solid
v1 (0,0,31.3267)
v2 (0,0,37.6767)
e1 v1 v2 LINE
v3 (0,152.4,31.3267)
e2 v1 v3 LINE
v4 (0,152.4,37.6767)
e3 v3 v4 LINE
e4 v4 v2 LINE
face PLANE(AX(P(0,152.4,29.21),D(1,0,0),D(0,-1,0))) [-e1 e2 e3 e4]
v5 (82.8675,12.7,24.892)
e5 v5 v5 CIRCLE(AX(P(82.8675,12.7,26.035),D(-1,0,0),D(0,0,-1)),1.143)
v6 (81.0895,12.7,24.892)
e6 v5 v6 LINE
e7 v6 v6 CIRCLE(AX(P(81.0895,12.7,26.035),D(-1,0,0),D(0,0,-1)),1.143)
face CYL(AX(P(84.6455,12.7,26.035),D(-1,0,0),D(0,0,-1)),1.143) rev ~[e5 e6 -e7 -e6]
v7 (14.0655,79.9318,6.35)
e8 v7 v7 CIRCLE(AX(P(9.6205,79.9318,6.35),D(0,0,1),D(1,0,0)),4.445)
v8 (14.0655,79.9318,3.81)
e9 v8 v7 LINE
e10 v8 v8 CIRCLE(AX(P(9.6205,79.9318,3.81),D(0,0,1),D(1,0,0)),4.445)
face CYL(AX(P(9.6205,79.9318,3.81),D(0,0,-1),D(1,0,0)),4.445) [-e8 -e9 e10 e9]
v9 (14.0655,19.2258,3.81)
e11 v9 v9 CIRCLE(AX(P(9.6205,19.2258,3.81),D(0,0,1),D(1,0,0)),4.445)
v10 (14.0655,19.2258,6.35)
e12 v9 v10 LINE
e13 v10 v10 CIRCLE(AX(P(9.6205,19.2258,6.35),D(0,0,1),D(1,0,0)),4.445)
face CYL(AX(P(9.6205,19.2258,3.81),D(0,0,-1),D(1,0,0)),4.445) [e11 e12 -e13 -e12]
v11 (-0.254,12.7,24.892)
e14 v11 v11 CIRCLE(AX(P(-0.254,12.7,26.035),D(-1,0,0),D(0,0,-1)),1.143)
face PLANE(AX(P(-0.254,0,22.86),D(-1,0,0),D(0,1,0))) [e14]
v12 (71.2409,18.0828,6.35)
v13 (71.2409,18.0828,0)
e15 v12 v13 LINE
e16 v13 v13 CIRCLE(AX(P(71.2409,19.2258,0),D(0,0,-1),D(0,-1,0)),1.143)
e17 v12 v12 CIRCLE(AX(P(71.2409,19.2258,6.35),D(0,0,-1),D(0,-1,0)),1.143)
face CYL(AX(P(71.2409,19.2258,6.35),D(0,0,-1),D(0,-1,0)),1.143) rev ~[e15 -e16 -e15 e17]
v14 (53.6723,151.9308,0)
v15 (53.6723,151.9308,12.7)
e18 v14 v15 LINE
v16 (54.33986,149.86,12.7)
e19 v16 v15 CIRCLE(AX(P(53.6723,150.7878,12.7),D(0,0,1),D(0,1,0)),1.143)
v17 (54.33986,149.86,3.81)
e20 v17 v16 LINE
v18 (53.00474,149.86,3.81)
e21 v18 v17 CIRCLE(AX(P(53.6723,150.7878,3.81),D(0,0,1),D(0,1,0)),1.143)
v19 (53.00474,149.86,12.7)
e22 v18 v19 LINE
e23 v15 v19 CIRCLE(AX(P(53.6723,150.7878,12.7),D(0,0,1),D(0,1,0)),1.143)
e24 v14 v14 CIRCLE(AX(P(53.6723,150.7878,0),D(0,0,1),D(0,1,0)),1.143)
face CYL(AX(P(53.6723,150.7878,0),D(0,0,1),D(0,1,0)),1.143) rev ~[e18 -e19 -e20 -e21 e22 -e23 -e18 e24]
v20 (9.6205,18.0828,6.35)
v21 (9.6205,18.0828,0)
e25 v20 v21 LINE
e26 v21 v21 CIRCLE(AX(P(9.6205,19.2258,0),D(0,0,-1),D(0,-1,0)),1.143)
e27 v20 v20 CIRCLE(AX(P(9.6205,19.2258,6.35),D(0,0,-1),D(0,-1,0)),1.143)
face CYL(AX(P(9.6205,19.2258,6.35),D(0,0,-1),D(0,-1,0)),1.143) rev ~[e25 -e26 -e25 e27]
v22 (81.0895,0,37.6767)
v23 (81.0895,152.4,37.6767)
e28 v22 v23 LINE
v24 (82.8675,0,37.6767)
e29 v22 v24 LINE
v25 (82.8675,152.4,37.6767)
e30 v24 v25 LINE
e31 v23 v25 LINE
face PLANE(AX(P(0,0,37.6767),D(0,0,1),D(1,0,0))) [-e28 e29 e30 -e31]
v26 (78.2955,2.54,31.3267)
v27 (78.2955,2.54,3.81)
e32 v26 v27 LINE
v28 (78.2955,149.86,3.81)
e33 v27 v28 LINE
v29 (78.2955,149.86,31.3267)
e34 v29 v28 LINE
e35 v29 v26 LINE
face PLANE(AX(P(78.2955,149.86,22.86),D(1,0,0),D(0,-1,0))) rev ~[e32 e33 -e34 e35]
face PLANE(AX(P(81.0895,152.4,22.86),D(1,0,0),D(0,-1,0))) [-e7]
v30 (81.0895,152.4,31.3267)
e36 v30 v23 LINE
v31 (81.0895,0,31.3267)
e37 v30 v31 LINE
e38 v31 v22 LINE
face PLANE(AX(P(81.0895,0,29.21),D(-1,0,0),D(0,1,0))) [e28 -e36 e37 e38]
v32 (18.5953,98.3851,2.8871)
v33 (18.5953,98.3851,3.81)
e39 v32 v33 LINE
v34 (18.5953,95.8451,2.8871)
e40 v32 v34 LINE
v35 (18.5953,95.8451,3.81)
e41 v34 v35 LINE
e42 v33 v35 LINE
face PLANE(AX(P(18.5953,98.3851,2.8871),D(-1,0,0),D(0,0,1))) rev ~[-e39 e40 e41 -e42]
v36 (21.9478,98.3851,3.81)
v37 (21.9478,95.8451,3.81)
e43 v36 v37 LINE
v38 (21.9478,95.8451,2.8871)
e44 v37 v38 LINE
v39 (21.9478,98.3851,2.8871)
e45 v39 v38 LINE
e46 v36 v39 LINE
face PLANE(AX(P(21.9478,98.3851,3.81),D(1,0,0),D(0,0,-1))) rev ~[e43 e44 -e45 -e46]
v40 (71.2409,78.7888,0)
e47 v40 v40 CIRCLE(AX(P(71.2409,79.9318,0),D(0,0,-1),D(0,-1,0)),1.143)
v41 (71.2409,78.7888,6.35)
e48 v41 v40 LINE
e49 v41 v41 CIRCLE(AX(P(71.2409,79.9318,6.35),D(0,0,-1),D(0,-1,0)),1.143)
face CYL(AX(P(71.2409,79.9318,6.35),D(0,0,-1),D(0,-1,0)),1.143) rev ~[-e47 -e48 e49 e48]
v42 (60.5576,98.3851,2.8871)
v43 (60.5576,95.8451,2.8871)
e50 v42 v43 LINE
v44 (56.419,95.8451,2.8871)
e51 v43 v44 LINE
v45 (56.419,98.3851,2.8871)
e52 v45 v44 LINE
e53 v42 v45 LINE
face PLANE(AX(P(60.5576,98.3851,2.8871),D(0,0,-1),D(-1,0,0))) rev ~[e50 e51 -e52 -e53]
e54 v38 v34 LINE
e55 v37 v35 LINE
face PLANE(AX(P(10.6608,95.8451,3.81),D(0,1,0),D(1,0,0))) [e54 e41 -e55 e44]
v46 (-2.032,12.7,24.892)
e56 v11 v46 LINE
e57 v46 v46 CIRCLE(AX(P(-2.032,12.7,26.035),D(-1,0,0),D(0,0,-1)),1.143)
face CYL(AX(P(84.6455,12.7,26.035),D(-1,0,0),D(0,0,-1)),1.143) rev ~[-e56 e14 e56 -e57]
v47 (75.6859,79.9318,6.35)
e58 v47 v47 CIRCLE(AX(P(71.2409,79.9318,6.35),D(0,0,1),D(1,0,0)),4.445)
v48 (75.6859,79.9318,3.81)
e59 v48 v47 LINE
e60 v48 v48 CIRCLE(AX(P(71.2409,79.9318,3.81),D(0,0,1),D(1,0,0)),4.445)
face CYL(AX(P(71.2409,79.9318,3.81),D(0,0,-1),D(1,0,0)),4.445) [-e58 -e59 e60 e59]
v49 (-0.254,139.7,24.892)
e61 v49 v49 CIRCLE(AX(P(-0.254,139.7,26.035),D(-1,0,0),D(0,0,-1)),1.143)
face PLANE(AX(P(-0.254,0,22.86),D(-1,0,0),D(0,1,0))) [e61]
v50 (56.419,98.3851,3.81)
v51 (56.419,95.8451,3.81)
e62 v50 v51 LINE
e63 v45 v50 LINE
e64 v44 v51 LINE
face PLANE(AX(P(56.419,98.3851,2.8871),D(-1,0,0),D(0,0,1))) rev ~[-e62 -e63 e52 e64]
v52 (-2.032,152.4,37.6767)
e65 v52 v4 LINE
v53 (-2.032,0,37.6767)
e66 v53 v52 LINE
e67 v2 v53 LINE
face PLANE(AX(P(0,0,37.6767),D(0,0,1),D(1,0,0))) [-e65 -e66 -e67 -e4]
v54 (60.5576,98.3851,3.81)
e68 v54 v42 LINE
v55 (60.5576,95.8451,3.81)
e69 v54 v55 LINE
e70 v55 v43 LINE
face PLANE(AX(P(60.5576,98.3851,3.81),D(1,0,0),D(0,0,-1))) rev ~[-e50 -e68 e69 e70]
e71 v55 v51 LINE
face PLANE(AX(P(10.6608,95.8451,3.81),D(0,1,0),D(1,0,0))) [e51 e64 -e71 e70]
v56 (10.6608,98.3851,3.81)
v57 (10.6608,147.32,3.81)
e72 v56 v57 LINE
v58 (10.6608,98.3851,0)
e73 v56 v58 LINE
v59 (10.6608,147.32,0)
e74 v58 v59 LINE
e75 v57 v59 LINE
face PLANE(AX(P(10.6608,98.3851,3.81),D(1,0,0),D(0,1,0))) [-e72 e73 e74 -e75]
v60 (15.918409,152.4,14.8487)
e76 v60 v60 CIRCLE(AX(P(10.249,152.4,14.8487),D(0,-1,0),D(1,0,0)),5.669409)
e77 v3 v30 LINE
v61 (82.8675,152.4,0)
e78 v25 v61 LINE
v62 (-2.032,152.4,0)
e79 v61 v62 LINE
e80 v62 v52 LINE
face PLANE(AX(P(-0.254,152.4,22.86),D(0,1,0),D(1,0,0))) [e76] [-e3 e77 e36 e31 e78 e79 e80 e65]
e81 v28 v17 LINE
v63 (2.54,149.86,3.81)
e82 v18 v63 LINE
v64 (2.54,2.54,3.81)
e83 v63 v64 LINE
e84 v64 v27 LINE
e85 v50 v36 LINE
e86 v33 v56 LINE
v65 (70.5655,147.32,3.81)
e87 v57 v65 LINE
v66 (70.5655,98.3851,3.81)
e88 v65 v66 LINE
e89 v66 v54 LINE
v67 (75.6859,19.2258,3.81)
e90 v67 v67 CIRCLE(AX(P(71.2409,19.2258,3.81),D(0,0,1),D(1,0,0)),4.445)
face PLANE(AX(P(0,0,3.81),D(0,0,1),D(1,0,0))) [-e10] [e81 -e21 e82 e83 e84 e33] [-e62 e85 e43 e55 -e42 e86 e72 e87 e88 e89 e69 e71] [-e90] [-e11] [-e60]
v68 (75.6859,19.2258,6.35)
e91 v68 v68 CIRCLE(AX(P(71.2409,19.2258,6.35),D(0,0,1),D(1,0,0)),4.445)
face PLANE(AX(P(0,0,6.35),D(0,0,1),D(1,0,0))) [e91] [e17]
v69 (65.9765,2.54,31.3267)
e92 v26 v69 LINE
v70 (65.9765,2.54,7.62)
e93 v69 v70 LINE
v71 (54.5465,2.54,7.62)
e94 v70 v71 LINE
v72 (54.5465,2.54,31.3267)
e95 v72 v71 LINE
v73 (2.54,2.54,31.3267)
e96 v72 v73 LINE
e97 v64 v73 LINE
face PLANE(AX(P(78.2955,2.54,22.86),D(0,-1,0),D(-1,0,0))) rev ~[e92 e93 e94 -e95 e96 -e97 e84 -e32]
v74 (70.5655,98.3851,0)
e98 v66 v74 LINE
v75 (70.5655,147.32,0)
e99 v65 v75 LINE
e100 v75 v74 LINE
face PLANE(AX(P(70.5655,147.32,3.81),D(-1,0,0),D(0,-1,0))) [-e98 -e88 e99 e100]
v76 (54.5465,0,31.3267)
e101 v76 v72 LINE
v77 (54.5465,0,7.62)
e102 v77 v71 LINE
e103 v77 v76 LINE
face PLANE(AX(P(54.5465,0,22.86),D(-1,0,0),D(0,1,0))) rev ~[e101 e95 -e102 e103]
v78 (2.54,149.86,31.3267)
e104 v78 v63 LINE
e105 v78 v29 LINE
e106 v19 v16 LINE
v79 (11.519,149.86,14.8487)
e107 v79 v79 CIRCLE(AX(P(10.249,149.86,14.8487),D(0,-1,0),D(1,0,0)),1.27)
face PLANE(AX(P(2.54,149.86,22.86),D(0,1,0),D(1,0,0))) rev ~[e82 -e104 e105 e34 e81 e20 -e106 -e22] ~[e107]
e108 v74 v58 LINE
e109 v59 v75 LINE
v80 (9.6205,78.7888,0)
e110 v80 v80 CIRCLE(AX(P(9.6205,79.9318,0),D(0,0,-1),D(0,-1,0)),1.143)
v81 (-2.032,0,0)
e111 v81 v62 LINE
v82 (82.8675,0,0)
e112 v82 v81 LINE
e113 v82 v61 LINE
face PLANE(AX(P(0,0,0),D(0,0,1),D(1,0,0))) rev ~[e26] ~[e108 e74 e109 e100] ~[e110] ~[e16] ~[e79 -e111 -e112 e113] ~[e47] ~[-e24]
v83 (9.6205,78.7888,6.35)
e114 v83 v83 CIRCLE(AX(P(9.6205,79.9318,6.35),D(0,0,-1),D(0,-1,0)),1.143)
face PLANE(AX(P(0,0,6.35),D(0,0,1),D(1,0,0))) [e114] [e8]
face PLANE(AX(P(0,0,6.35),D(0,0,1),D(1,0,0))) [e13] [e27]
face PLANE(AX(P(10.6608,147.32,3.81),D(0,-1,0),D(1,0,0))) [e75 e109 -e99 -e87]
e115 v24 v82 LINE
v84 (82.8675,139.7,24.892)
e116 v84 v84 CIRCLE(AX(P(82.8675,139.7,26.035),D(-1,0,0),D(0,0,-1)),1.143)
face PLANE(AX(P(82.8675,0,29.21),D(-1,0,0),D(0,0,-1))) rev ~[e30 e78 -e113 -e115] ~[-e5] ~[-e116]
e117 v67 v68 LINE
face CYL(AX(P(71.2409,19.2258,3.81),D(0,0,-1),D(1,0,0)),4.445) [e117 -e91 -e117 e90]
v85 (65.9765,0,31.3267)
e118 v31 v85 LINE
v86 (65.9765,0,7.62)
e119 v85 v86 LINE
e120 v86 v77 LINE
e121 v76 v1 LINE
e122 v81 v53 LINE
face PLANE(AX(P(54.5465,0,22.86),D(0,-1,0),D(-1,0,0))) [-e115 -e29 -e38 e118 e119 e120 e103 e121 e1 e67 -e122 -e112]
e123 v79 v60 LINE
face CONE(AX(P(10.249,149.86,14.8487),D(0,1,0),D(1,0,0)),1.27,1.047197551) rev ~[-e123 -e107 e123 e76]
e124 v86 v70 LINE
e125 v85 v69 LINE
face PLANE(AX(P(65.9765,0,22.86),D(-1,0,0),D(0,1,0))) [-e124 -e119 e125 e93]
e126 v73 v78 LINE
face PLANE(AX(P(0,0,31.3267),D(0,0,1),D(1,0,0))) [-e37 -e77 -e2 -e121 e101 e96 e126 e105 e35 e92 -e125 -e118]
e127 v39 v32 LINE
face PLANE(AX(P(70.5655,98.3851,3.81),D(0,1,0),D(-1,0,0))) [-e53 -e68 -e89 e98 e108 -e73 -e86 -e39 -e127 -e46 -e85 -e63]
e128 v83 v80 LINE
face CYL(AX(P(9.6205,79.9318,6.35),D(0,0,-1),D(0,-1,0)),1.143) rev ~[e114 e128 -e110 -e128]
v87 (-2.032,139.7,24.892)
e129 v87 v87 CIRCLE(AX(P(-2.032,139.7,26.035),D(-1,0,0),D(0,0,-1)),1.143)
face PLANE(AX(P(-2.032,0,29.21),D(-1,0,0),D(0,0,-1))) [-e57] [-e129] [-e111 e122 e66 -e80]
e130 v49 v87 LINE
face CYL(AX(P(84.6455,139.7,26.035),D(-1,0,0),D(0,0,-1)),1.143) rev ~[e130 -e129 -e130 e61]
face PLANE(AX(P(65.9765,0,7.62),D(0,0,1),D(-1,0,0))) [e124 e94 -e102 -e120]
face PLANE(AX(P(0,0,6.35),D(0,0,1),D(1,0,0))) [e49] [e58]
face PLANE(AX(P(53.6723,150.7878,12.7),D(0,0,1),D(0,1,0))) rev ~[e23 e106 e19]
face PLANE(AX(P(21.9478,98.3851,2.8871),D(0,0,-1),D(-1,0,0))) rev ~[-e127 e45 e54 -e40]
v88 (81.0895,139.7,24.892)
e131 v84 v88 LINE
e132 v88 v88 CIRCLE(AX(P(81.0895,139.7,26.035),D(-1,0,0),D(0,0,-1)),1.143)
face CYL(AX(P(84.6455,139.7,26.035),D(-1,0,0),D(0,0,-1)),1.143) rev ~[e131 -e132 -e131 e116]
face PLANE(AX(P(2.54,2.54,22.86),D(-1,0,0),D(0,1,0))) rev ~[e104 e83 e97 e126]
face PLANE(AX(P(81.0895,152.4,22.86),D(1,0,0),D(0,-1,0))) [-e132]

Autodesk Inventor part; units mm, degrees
ref_plane "YZ Plane" through (0, 0, 0) normal (1, 0, 0) x (0, 1, 0)
ref_plane "XZ Plane" through (0, 0, 0) normal (0, 1, 0) x (-1, 0, 0)
ref_plane "XY Plane" through (0, 0, 0) normal (0, 0, 1) x (1, 0, 0)
sketch "Sketch1" plane through (0, 0, 0) normal (0, 0, 1) x (1, 0, 0)
  line L0 (0, 0) -> (80.8355, 0)
  line L1 (80.8355, 0) -> (80.8355, 152.4)
  line L2 (80.8355, 152.4) -> (0, 152.4)
  line L3 (0, 152.4) -> (0, 0)
  dimension "d82" = 80.8355
  dimension "d90" = 152.4
extrude "Extrusion1" add sketch "Sketch1" along normal blind 22.86
sketch "Sketch2" plane through (0, 0, 22.86) normal (0, 0, 1) x (1, 0, 0)
  line L0 (2.54, 2.54) -> (78.2955, 2.54)
  line L1 (78.2955, 2.54) -> (78.2955, 149.86)
  line L2 (78.2955, 149.86) -> (2.54, 149.86)
  line L3 (2.54, 149.86) -> (2.54, 2.54)
  line L4 (0, 152.4) -> (0, 0)
  line L5 (0, 0) -> (80.8355, 0)
  line L6 (80.8355, 0) -> (80.8355, 152.4)
  line L7 (80.8355, 152.4) -> (0, 152.4)
  line L8 (0, 152.4) -> (0, 0) projected
  line L9 (0, 0) -> (80.8355, 0) projected
  point P0 (80.8355, 76.2)
  point P1 (0, 76.2)
  point P2 (40.4177, 0)
  dimension "d83" = 152.4
  dimension "d85" = 80.8355
  dimension "d86" = 2.54
  dimension "d87" = 2.54
  dimension "d88" = 2.54
  dimension "d89" = 2.54
extrude "Extrusion2" cut sketch "Sketch2" against normal blind 19.05 contours L3 L2 L1 L0
sketch "Sketch6" plane through (0, 0, 3.81) normal (0, 0, 1) x (1, 0, 0)
  line L0 (5.1487, 87.2258) -> (75.6867, 87.2258) construction
  line L1 (75.6867, 87.2258) -> (75.6867, 3.2258) construction
  line L2 (75.6867, 3.2258) -> (5.1487, 3.2258) construction
  line L3 (5.1487, 3.2258) -> (5.1487, 87.2258) construction
  circle A0 centre (9.6205, 79.9318) radius 1.6 construction
  circle A1 centre (71.2409, 79.9318) radius 1.6 construction
  circle A2 centre (9.6205, 19.2258) radius 1.6 construction
  circle A3 centre (71.2409, 19.2258) radius 1.6 construction
  line L4 (2.54, 149.86) -> (78.2955, 149.86) projected
  line L5 (0, 0) -> (80.8355, 0) projected
  line L6 (78.2955, 2.54) -> (2.54, 2.54) projected
  circle A4 centre (9.6205, 79.9318) radius 4.445
  circle A5 centre (71.2409, 79.9318) radius 4.445
  circle A6 centre (9.6205, 19.2258) radius 4.445
  circle A7 centre (71.2409, 19.2258) radius 4.445
  point P0 (40.4177, 87.2258)
  point P1 (40.4177, 149.86)
  point P2 (3.175, 0)
  point P3 (77.6605, 0)
  point P4 (2.54, 2.54)
  point P5 (14.1287, 30.2258)
  point P6 (46.6867, 15.7258)
  point P7 (60.2637, 3.2258)
  point P8 (80.8355, 12.6941)
  dimension "d18" = 70.538
  dimension "d19" = 84
  dimension "d30" = 3.2
  dimension "d31" = 60.706
  dimension "d32" = 61.6204
  dimension "d33" = 16
  dimension "d34" = 4.4458
  dimension "d36" = 0.6858
  dimension "d37" = 27
  dimension "d38" = 8.98
  dimension "d39" = 12.5
  dimension "d40" = 29
  dimension "d41" = 15.423
  dimension "d69" = 8.89
  dimension "d70" = 8.89
  dimension "d71" = 8.89
  dimension "d72" = 8.89
extrude "Extrusion7" add sketch "Sketch6" along normal blind 2.54
sketch "Sketch15" plane through (9.6205, 79.9318, 6.35) normal (0, 0, 1) x (1, 0, 0)
  circle A0 centre (0, 0) radius 4.445 projected
  circle A1 centre (61.6204, 0) radius 4.445 projected
  circle A2 centre (61.6204, -60.706) radius 4.445 projected
  circle A3 centre (0, -60.706) radius 4.445 projected
  point P0 (-9.6205, -79.9318)
  point P1 (61.6204, -60.706)
  point P2 (0, -60.706)
hole "Hole3" at (9.6205, 79.9318, 6.35) at (71.2409, 79.9318, 6.35) at (71.2409, 19.2258, 6.35) at (9.6205, 19.2258, 6.35) direction (0, 0, -1) diameter 2.286 depth 6.35
sketch "Sketch16" plane through (0, 0, 3.81) normal (0, 0, 1) x (1, 0, 0)
  line L0 (10.6608, 147.32) -> (70.5655, 147.32)
  line L1 (70.5655, 147.32) -> (70.5655, 98.3851)
  line L2 (70.5655, 98.3851) -> (10.6608, 98.3851)
  line L3 (10.6608, 98.3851) -> (10.6608, 147.32)
  line L4 (2.54, 149.86) -> (78.2955, 149.86) projected
  point P0 (0, 0)
  dimension "d150" = 48.9349
  dimension "d151" = 59.9047
  dimension "d152" = 2.54
extrude "Extrusion8" cut sketch "Sketch16" against normal blind 25.4
sketch "Sketch17" plane through (2.54, 149.86, 22.86) normal (0, -1, 0) x (1, 0, 0)
  circle A0 centre (7.709, -8.0113) radius 1.27
  point P0 (-2.54, -22.86)
  dimension "d93" = 2.54
extrude "Extrusion9" cut sketch "Sketch17" along normal blind 25.4 and the other way blind 12.7 draft 60
sketch "Sketch18" plane through (10.6608, 98.3851, 3.81) normal (0, 1, 0) x (1, 0, 0)
  line L0 (59.9047, 0) -> (0, 0) projected
  line L1 (7.9345, 0) -> (11.287, 0)
  line L2 (11.287, 0) -> (11.287, 0.9229)
  line L3 (11.287, 0.9229) -> (7.9345, 0.9229)
  line L4 (7.9345, 0.9229) -> (7.9345, 0)
  line L5 (45.7582, 0) -> (49.8968, 0)
  line L6 (49.8968, 0) -> (49.8968, 0.9229)
  line L7 (49.8968, 0.9229) -> (45.7582, 0.9229)
  line L8 (45.7582, 0.9229) -> (45.7582, 0)
  point P0 (-10.6608, 3.81)
  point P1 (11.287, 0)
extrude "Extrusion10" cut sketch "Sketch18" against normal blind 2.54
sketch "Sketch19" plane through (0, 0, 3.81) normal (0, 0, 1) x (1, 0, 0)
  point P0 (0, 0)
sketch "Sketch23" plane through (0, 0, 0) normal (0, 0, -1) x (-1, 0, 0)
  line L0 (-84.6455, 152.4) -> (3.81, 152.4)
  line L1 (3.81, 152.4) -> (3.81, 0)
  line L2 (3.81, 0) -> (-84.6455, 0)
  line L3 (-84.6455, 0) -> (-84.6455, 152.4)
  line L4 (0, 0) -> (-80.8355, 0) projected
  line L5 (-80.8355, 152.4) -> (0, 152.4) projected
  line L6 (-80.8355, 0) -> (-80.8355, 152.4) projected
  line L7 (0, 152.4) -> (0, 0) projected
  point P0 (0, 152.4)
  dimension "d109" = 0
  dimension "d110" = 0
  dimension "d111" = 3.81
  dimension "d112" = 3.81
extrude "Extrusion12" add sketch "Sketch23" against normal blind 29.21 contours L0 L6 L2 L3 | L0 L1 L2 L7
sketch "Sketch24" plane through (84.6455, 0, 0) normal (1, 0, 0) x (0, 0, -1)
  line L0 (-29.21, 0) -> (-29.21, 152.4) projected
  line L1 (0, 152.4) -> (-29.21, 152.4) projected
  line L2 (0, 0) -> (-29.21, 0) projected
  point P0 (-26.035, 12.7)
  point P1 (-26.035, 139.7)
  dimension "d115" = 3.175
  dimension "d116" = 12.7
  dimension "d117" = 12.7
  dimension "d118" = 3.175
hole "Hole5" at (84.6455, 139.7, 26.035) at (84.6455, 12.7, 26.035) direction (-1, 0, 0) diameter 2.286 end through all
sketch "Sketch25" plane through (-3.81, 0, 0) normal (0, -1, 0) x (1, 0, 0)
  line L0 (3.81, 22.86) -> (84.6455, 22.86) projected
  line L1 (58.3565, 22.86) -> (69.7865, 22.86)
  line L2 (69.7865, 22.86) -> (69.7865, 7.62)
  line L3 (69.7865, 7.62) -> (58.3565, 7.62)
  line L4 (58.3565, 7.62) -> (58.3565, 22.86)
  line L5 (88.4555, 0) -> (88.4555, 29.21) projected
  point P0 (3.81, 0)
  point P1 (69.7865, 15.24)
  point P2 (64.0715, 22.86)
  point P3 (64.0715, 7.62)
  point P4 (44.2278, 22.86)
  dimension "d126" = 11.43
  dimension "d127" = 15.24
  dimension "d129" = 19.8438
extrude "Extrusion13" cut sketch "Sketch25" against normal up to surface (2.54 mm away)
sketch "Sketch26" plane through (-3.81, 0, 0) normal (0, -1, 0) x (1, 0, 0)
  line L0 (0, 29.21) -> (3.81, 29.21) projected
  line L1 (3.556, 29.21) -> (84.8995, 29.21)
  line L2 (84.8995, 29.21) -> (84.8995, 22.86)
  line L3 (84.8995, 22.86) -> (3.556, 22.86)
  line L4 (3.556, 22.86) -> (3.556, 29.21)
  line L5 (3.81, 22.86) -> (58.3565, 22.86) projected
  line L6 (3.81, 22.86) -> (3.81, 29.21) projected
  line L7 (84.6455, 22.86) -> (84.6455, 29.21) projected
  line L8 (3.81, 29.21) -> (84.6455, 29.21)
  line L9 (84.6455, 29.21) -> (84.6455, 22.86)
  line L10 (84.6455, 22.86) -> (3.81, 22.86)
  line L11 (3.81, 22.86) -> (3.81, 29.21)
  point P0 (3.81, 0)
  point P1 (84.8995, 26.035)
  dimension "d132" = 0
  dimension "d133" = 0.254
  dimension "d134" = 0.254
extrude "Extrusion14" cut sketch "Sketch26" against normal through all contours L0 L6 L3 L4 | L1 L2 L3 L7
sketch "Sketch27" plane through (-3.81, 0, 0) normal (0, -1, 0) x (1, 0, 0)
  line L0 (0, 29.21) -> (1.778, 29.21)
  line L1 (1.778, 29.21) -> (1.778, 0)
  line L2 (1.778, 0) -> (0, 0)
  line L3 (0, 0) -> (0, 29.21)
  line L4 (3.556, 22.86) -> (3.556, 29.21) projected
  line L5 (88.4555, 0) -> (88.4555, 29.21) projected
  line L6 (88.4555, 0) -> (0, 0) projected
  line L7 (88.4555, 29.21) -> (86.6775, 29.21)
  line L8 (86.6775, 29.21) -> (86.6775, 0)
  line L9 (86.6775, 0) -> (88.4555, 0)
  line L10 (88.4555, 0) -> (88.4555, 29.21)
  point P0 (3.81, 0)
  point P1 (0.889, 0)
  dimension "d137" = 1.778
  dimension "d138" = 1.778
  dimension "d139" = 0
extrude "Extrusion15" cut sketch "Sketch27" against normal through all
sketch "Sketch28" plane through (0, 0, 22.86) normal (0, 0, 1) x (1, 0, 0)
  line L0 (-0.254, 152.4) -> (81.0895, 152.4) projected
  line L1 (82.8675, 0) -> (-2.032, 0) projected
  line L2 (-0.254, 152.4) -> (81.0895, 152.4)
  line L3 (81.0895, 152.4) -> (81.0895, 0)
  line L4 (81.0895, 0) -> (-0.254, 0)
  line L5 (-0.254, 0) -> (-0.254, 152.4)
  line L6 (81.0895, 152.4) -> (81.0895, 0) projected
  line L7 (2.54, 149.86) -> (78.2955, 149.86) projected
  line L8 (78.2955, 149.86) -> (78.2955, 2.54) projected
  line L9 (2.54, 149.86) -> (78.2955, 149.86)
  line L10 (78.2955, 149.86) -> (78.2955, 2.54)
  line L11 (78.2955, 2.54) -> (2.54, 2.54)
  line L12 (2.54, 2.54) -> (2.54, 149.86)
  line L13 (54.5465, 2.54) -> (2.54, 2.54) projected
  line L14 (54.5465, 0) -> (54.5465, 2.54) projected
  line L15 (54.5465, 2.54) -> (54.5465, 0)
  line L16 (65.9765, 0) -> (65.9765, 2.54) projected
  line L17 (65.9765, 0) -> (65.9765, 2.54)
  line L18 (78.2955, 2.54) -> (2.54, 2.54) projected
  point P0 (0, 0)
  point P1 (-0.254, 0)
  dimension "d142" = 0
extrude "Extrusion16" add sketch "Sketch28" along normal blind 8.4667 contours L0 L3 L1 L16 L11 L8 L7 L12 L14 L5
sketch "Sketch29" plane through (0, 0, 29.21) normal (0, 0, 1) x (1, 0, 0)
  line L0 (-2.032, 152.4) -> (82.8675, 152.4) projected
  line L1 (-2.032, 152.4) -> (0, 152.4)
  line L2 (0, 152.4) -> (0, 0)
  line L3 (0, 0) -> (-2.032, 0)
  line L4 (-2.032, 0) -> (-2.032, 152.4)
  line L5 (82.8675, 0) -> (82.8675, 152.4) projected
  line L6 (81.0895, 0) -> (81.0895, 152.4) projected
  line L7 (82.8675, 152.4) -> (81.0895, 152.4)
  line L8 (81.0895, 152.4) -> (81.0895, 0)
  line L9 (81.0895, 0) -> (82.8675, 0)
  line L10 (82.8675, 0) -> (82.8675, 152.4)
extrude "Extrusion17" add sketch "Sketch29" along normal blind 8.4667
sketch "Sketch30" plane through (0, 0, 3.81) normal (0, 0, 1) x (1, 0, 0)
  line L0 (10.6608, 147.32) -> (70.5655, 147.32) projected
  line L1 (70.5655, 147.32) -> (70.5655, 98.3851) projected
  point P0 (0, 0)
  point P1 (53.6723, 150.7878)
  point P2 (57.4821, 140.1387)
  dimension "d154" = 3.4678
  dimension "d155" = 16.8932
sketch "Sketch31" plane through (0, 0, 0) normal (0, 0, -1) x (-1, 0, 0)
  line L0 (-70.5655, 147.32) -> (-10.6608, 147.32) projected
  line L1 (-70.5655, 98.3851) -> (-70.5655, 147.32) projected
  point P0 (0, 0)
  point P1 (-53.6723, 150.7878)
  dimension "d156" = 3.4678
  dimension "d157" = 16.8932
hole "Hole6" at (53.6723, 150.7878, 0) direction (0, 0, 1) diameter 2.286 depth 12.7
properties part number "Bottom_Shell"
